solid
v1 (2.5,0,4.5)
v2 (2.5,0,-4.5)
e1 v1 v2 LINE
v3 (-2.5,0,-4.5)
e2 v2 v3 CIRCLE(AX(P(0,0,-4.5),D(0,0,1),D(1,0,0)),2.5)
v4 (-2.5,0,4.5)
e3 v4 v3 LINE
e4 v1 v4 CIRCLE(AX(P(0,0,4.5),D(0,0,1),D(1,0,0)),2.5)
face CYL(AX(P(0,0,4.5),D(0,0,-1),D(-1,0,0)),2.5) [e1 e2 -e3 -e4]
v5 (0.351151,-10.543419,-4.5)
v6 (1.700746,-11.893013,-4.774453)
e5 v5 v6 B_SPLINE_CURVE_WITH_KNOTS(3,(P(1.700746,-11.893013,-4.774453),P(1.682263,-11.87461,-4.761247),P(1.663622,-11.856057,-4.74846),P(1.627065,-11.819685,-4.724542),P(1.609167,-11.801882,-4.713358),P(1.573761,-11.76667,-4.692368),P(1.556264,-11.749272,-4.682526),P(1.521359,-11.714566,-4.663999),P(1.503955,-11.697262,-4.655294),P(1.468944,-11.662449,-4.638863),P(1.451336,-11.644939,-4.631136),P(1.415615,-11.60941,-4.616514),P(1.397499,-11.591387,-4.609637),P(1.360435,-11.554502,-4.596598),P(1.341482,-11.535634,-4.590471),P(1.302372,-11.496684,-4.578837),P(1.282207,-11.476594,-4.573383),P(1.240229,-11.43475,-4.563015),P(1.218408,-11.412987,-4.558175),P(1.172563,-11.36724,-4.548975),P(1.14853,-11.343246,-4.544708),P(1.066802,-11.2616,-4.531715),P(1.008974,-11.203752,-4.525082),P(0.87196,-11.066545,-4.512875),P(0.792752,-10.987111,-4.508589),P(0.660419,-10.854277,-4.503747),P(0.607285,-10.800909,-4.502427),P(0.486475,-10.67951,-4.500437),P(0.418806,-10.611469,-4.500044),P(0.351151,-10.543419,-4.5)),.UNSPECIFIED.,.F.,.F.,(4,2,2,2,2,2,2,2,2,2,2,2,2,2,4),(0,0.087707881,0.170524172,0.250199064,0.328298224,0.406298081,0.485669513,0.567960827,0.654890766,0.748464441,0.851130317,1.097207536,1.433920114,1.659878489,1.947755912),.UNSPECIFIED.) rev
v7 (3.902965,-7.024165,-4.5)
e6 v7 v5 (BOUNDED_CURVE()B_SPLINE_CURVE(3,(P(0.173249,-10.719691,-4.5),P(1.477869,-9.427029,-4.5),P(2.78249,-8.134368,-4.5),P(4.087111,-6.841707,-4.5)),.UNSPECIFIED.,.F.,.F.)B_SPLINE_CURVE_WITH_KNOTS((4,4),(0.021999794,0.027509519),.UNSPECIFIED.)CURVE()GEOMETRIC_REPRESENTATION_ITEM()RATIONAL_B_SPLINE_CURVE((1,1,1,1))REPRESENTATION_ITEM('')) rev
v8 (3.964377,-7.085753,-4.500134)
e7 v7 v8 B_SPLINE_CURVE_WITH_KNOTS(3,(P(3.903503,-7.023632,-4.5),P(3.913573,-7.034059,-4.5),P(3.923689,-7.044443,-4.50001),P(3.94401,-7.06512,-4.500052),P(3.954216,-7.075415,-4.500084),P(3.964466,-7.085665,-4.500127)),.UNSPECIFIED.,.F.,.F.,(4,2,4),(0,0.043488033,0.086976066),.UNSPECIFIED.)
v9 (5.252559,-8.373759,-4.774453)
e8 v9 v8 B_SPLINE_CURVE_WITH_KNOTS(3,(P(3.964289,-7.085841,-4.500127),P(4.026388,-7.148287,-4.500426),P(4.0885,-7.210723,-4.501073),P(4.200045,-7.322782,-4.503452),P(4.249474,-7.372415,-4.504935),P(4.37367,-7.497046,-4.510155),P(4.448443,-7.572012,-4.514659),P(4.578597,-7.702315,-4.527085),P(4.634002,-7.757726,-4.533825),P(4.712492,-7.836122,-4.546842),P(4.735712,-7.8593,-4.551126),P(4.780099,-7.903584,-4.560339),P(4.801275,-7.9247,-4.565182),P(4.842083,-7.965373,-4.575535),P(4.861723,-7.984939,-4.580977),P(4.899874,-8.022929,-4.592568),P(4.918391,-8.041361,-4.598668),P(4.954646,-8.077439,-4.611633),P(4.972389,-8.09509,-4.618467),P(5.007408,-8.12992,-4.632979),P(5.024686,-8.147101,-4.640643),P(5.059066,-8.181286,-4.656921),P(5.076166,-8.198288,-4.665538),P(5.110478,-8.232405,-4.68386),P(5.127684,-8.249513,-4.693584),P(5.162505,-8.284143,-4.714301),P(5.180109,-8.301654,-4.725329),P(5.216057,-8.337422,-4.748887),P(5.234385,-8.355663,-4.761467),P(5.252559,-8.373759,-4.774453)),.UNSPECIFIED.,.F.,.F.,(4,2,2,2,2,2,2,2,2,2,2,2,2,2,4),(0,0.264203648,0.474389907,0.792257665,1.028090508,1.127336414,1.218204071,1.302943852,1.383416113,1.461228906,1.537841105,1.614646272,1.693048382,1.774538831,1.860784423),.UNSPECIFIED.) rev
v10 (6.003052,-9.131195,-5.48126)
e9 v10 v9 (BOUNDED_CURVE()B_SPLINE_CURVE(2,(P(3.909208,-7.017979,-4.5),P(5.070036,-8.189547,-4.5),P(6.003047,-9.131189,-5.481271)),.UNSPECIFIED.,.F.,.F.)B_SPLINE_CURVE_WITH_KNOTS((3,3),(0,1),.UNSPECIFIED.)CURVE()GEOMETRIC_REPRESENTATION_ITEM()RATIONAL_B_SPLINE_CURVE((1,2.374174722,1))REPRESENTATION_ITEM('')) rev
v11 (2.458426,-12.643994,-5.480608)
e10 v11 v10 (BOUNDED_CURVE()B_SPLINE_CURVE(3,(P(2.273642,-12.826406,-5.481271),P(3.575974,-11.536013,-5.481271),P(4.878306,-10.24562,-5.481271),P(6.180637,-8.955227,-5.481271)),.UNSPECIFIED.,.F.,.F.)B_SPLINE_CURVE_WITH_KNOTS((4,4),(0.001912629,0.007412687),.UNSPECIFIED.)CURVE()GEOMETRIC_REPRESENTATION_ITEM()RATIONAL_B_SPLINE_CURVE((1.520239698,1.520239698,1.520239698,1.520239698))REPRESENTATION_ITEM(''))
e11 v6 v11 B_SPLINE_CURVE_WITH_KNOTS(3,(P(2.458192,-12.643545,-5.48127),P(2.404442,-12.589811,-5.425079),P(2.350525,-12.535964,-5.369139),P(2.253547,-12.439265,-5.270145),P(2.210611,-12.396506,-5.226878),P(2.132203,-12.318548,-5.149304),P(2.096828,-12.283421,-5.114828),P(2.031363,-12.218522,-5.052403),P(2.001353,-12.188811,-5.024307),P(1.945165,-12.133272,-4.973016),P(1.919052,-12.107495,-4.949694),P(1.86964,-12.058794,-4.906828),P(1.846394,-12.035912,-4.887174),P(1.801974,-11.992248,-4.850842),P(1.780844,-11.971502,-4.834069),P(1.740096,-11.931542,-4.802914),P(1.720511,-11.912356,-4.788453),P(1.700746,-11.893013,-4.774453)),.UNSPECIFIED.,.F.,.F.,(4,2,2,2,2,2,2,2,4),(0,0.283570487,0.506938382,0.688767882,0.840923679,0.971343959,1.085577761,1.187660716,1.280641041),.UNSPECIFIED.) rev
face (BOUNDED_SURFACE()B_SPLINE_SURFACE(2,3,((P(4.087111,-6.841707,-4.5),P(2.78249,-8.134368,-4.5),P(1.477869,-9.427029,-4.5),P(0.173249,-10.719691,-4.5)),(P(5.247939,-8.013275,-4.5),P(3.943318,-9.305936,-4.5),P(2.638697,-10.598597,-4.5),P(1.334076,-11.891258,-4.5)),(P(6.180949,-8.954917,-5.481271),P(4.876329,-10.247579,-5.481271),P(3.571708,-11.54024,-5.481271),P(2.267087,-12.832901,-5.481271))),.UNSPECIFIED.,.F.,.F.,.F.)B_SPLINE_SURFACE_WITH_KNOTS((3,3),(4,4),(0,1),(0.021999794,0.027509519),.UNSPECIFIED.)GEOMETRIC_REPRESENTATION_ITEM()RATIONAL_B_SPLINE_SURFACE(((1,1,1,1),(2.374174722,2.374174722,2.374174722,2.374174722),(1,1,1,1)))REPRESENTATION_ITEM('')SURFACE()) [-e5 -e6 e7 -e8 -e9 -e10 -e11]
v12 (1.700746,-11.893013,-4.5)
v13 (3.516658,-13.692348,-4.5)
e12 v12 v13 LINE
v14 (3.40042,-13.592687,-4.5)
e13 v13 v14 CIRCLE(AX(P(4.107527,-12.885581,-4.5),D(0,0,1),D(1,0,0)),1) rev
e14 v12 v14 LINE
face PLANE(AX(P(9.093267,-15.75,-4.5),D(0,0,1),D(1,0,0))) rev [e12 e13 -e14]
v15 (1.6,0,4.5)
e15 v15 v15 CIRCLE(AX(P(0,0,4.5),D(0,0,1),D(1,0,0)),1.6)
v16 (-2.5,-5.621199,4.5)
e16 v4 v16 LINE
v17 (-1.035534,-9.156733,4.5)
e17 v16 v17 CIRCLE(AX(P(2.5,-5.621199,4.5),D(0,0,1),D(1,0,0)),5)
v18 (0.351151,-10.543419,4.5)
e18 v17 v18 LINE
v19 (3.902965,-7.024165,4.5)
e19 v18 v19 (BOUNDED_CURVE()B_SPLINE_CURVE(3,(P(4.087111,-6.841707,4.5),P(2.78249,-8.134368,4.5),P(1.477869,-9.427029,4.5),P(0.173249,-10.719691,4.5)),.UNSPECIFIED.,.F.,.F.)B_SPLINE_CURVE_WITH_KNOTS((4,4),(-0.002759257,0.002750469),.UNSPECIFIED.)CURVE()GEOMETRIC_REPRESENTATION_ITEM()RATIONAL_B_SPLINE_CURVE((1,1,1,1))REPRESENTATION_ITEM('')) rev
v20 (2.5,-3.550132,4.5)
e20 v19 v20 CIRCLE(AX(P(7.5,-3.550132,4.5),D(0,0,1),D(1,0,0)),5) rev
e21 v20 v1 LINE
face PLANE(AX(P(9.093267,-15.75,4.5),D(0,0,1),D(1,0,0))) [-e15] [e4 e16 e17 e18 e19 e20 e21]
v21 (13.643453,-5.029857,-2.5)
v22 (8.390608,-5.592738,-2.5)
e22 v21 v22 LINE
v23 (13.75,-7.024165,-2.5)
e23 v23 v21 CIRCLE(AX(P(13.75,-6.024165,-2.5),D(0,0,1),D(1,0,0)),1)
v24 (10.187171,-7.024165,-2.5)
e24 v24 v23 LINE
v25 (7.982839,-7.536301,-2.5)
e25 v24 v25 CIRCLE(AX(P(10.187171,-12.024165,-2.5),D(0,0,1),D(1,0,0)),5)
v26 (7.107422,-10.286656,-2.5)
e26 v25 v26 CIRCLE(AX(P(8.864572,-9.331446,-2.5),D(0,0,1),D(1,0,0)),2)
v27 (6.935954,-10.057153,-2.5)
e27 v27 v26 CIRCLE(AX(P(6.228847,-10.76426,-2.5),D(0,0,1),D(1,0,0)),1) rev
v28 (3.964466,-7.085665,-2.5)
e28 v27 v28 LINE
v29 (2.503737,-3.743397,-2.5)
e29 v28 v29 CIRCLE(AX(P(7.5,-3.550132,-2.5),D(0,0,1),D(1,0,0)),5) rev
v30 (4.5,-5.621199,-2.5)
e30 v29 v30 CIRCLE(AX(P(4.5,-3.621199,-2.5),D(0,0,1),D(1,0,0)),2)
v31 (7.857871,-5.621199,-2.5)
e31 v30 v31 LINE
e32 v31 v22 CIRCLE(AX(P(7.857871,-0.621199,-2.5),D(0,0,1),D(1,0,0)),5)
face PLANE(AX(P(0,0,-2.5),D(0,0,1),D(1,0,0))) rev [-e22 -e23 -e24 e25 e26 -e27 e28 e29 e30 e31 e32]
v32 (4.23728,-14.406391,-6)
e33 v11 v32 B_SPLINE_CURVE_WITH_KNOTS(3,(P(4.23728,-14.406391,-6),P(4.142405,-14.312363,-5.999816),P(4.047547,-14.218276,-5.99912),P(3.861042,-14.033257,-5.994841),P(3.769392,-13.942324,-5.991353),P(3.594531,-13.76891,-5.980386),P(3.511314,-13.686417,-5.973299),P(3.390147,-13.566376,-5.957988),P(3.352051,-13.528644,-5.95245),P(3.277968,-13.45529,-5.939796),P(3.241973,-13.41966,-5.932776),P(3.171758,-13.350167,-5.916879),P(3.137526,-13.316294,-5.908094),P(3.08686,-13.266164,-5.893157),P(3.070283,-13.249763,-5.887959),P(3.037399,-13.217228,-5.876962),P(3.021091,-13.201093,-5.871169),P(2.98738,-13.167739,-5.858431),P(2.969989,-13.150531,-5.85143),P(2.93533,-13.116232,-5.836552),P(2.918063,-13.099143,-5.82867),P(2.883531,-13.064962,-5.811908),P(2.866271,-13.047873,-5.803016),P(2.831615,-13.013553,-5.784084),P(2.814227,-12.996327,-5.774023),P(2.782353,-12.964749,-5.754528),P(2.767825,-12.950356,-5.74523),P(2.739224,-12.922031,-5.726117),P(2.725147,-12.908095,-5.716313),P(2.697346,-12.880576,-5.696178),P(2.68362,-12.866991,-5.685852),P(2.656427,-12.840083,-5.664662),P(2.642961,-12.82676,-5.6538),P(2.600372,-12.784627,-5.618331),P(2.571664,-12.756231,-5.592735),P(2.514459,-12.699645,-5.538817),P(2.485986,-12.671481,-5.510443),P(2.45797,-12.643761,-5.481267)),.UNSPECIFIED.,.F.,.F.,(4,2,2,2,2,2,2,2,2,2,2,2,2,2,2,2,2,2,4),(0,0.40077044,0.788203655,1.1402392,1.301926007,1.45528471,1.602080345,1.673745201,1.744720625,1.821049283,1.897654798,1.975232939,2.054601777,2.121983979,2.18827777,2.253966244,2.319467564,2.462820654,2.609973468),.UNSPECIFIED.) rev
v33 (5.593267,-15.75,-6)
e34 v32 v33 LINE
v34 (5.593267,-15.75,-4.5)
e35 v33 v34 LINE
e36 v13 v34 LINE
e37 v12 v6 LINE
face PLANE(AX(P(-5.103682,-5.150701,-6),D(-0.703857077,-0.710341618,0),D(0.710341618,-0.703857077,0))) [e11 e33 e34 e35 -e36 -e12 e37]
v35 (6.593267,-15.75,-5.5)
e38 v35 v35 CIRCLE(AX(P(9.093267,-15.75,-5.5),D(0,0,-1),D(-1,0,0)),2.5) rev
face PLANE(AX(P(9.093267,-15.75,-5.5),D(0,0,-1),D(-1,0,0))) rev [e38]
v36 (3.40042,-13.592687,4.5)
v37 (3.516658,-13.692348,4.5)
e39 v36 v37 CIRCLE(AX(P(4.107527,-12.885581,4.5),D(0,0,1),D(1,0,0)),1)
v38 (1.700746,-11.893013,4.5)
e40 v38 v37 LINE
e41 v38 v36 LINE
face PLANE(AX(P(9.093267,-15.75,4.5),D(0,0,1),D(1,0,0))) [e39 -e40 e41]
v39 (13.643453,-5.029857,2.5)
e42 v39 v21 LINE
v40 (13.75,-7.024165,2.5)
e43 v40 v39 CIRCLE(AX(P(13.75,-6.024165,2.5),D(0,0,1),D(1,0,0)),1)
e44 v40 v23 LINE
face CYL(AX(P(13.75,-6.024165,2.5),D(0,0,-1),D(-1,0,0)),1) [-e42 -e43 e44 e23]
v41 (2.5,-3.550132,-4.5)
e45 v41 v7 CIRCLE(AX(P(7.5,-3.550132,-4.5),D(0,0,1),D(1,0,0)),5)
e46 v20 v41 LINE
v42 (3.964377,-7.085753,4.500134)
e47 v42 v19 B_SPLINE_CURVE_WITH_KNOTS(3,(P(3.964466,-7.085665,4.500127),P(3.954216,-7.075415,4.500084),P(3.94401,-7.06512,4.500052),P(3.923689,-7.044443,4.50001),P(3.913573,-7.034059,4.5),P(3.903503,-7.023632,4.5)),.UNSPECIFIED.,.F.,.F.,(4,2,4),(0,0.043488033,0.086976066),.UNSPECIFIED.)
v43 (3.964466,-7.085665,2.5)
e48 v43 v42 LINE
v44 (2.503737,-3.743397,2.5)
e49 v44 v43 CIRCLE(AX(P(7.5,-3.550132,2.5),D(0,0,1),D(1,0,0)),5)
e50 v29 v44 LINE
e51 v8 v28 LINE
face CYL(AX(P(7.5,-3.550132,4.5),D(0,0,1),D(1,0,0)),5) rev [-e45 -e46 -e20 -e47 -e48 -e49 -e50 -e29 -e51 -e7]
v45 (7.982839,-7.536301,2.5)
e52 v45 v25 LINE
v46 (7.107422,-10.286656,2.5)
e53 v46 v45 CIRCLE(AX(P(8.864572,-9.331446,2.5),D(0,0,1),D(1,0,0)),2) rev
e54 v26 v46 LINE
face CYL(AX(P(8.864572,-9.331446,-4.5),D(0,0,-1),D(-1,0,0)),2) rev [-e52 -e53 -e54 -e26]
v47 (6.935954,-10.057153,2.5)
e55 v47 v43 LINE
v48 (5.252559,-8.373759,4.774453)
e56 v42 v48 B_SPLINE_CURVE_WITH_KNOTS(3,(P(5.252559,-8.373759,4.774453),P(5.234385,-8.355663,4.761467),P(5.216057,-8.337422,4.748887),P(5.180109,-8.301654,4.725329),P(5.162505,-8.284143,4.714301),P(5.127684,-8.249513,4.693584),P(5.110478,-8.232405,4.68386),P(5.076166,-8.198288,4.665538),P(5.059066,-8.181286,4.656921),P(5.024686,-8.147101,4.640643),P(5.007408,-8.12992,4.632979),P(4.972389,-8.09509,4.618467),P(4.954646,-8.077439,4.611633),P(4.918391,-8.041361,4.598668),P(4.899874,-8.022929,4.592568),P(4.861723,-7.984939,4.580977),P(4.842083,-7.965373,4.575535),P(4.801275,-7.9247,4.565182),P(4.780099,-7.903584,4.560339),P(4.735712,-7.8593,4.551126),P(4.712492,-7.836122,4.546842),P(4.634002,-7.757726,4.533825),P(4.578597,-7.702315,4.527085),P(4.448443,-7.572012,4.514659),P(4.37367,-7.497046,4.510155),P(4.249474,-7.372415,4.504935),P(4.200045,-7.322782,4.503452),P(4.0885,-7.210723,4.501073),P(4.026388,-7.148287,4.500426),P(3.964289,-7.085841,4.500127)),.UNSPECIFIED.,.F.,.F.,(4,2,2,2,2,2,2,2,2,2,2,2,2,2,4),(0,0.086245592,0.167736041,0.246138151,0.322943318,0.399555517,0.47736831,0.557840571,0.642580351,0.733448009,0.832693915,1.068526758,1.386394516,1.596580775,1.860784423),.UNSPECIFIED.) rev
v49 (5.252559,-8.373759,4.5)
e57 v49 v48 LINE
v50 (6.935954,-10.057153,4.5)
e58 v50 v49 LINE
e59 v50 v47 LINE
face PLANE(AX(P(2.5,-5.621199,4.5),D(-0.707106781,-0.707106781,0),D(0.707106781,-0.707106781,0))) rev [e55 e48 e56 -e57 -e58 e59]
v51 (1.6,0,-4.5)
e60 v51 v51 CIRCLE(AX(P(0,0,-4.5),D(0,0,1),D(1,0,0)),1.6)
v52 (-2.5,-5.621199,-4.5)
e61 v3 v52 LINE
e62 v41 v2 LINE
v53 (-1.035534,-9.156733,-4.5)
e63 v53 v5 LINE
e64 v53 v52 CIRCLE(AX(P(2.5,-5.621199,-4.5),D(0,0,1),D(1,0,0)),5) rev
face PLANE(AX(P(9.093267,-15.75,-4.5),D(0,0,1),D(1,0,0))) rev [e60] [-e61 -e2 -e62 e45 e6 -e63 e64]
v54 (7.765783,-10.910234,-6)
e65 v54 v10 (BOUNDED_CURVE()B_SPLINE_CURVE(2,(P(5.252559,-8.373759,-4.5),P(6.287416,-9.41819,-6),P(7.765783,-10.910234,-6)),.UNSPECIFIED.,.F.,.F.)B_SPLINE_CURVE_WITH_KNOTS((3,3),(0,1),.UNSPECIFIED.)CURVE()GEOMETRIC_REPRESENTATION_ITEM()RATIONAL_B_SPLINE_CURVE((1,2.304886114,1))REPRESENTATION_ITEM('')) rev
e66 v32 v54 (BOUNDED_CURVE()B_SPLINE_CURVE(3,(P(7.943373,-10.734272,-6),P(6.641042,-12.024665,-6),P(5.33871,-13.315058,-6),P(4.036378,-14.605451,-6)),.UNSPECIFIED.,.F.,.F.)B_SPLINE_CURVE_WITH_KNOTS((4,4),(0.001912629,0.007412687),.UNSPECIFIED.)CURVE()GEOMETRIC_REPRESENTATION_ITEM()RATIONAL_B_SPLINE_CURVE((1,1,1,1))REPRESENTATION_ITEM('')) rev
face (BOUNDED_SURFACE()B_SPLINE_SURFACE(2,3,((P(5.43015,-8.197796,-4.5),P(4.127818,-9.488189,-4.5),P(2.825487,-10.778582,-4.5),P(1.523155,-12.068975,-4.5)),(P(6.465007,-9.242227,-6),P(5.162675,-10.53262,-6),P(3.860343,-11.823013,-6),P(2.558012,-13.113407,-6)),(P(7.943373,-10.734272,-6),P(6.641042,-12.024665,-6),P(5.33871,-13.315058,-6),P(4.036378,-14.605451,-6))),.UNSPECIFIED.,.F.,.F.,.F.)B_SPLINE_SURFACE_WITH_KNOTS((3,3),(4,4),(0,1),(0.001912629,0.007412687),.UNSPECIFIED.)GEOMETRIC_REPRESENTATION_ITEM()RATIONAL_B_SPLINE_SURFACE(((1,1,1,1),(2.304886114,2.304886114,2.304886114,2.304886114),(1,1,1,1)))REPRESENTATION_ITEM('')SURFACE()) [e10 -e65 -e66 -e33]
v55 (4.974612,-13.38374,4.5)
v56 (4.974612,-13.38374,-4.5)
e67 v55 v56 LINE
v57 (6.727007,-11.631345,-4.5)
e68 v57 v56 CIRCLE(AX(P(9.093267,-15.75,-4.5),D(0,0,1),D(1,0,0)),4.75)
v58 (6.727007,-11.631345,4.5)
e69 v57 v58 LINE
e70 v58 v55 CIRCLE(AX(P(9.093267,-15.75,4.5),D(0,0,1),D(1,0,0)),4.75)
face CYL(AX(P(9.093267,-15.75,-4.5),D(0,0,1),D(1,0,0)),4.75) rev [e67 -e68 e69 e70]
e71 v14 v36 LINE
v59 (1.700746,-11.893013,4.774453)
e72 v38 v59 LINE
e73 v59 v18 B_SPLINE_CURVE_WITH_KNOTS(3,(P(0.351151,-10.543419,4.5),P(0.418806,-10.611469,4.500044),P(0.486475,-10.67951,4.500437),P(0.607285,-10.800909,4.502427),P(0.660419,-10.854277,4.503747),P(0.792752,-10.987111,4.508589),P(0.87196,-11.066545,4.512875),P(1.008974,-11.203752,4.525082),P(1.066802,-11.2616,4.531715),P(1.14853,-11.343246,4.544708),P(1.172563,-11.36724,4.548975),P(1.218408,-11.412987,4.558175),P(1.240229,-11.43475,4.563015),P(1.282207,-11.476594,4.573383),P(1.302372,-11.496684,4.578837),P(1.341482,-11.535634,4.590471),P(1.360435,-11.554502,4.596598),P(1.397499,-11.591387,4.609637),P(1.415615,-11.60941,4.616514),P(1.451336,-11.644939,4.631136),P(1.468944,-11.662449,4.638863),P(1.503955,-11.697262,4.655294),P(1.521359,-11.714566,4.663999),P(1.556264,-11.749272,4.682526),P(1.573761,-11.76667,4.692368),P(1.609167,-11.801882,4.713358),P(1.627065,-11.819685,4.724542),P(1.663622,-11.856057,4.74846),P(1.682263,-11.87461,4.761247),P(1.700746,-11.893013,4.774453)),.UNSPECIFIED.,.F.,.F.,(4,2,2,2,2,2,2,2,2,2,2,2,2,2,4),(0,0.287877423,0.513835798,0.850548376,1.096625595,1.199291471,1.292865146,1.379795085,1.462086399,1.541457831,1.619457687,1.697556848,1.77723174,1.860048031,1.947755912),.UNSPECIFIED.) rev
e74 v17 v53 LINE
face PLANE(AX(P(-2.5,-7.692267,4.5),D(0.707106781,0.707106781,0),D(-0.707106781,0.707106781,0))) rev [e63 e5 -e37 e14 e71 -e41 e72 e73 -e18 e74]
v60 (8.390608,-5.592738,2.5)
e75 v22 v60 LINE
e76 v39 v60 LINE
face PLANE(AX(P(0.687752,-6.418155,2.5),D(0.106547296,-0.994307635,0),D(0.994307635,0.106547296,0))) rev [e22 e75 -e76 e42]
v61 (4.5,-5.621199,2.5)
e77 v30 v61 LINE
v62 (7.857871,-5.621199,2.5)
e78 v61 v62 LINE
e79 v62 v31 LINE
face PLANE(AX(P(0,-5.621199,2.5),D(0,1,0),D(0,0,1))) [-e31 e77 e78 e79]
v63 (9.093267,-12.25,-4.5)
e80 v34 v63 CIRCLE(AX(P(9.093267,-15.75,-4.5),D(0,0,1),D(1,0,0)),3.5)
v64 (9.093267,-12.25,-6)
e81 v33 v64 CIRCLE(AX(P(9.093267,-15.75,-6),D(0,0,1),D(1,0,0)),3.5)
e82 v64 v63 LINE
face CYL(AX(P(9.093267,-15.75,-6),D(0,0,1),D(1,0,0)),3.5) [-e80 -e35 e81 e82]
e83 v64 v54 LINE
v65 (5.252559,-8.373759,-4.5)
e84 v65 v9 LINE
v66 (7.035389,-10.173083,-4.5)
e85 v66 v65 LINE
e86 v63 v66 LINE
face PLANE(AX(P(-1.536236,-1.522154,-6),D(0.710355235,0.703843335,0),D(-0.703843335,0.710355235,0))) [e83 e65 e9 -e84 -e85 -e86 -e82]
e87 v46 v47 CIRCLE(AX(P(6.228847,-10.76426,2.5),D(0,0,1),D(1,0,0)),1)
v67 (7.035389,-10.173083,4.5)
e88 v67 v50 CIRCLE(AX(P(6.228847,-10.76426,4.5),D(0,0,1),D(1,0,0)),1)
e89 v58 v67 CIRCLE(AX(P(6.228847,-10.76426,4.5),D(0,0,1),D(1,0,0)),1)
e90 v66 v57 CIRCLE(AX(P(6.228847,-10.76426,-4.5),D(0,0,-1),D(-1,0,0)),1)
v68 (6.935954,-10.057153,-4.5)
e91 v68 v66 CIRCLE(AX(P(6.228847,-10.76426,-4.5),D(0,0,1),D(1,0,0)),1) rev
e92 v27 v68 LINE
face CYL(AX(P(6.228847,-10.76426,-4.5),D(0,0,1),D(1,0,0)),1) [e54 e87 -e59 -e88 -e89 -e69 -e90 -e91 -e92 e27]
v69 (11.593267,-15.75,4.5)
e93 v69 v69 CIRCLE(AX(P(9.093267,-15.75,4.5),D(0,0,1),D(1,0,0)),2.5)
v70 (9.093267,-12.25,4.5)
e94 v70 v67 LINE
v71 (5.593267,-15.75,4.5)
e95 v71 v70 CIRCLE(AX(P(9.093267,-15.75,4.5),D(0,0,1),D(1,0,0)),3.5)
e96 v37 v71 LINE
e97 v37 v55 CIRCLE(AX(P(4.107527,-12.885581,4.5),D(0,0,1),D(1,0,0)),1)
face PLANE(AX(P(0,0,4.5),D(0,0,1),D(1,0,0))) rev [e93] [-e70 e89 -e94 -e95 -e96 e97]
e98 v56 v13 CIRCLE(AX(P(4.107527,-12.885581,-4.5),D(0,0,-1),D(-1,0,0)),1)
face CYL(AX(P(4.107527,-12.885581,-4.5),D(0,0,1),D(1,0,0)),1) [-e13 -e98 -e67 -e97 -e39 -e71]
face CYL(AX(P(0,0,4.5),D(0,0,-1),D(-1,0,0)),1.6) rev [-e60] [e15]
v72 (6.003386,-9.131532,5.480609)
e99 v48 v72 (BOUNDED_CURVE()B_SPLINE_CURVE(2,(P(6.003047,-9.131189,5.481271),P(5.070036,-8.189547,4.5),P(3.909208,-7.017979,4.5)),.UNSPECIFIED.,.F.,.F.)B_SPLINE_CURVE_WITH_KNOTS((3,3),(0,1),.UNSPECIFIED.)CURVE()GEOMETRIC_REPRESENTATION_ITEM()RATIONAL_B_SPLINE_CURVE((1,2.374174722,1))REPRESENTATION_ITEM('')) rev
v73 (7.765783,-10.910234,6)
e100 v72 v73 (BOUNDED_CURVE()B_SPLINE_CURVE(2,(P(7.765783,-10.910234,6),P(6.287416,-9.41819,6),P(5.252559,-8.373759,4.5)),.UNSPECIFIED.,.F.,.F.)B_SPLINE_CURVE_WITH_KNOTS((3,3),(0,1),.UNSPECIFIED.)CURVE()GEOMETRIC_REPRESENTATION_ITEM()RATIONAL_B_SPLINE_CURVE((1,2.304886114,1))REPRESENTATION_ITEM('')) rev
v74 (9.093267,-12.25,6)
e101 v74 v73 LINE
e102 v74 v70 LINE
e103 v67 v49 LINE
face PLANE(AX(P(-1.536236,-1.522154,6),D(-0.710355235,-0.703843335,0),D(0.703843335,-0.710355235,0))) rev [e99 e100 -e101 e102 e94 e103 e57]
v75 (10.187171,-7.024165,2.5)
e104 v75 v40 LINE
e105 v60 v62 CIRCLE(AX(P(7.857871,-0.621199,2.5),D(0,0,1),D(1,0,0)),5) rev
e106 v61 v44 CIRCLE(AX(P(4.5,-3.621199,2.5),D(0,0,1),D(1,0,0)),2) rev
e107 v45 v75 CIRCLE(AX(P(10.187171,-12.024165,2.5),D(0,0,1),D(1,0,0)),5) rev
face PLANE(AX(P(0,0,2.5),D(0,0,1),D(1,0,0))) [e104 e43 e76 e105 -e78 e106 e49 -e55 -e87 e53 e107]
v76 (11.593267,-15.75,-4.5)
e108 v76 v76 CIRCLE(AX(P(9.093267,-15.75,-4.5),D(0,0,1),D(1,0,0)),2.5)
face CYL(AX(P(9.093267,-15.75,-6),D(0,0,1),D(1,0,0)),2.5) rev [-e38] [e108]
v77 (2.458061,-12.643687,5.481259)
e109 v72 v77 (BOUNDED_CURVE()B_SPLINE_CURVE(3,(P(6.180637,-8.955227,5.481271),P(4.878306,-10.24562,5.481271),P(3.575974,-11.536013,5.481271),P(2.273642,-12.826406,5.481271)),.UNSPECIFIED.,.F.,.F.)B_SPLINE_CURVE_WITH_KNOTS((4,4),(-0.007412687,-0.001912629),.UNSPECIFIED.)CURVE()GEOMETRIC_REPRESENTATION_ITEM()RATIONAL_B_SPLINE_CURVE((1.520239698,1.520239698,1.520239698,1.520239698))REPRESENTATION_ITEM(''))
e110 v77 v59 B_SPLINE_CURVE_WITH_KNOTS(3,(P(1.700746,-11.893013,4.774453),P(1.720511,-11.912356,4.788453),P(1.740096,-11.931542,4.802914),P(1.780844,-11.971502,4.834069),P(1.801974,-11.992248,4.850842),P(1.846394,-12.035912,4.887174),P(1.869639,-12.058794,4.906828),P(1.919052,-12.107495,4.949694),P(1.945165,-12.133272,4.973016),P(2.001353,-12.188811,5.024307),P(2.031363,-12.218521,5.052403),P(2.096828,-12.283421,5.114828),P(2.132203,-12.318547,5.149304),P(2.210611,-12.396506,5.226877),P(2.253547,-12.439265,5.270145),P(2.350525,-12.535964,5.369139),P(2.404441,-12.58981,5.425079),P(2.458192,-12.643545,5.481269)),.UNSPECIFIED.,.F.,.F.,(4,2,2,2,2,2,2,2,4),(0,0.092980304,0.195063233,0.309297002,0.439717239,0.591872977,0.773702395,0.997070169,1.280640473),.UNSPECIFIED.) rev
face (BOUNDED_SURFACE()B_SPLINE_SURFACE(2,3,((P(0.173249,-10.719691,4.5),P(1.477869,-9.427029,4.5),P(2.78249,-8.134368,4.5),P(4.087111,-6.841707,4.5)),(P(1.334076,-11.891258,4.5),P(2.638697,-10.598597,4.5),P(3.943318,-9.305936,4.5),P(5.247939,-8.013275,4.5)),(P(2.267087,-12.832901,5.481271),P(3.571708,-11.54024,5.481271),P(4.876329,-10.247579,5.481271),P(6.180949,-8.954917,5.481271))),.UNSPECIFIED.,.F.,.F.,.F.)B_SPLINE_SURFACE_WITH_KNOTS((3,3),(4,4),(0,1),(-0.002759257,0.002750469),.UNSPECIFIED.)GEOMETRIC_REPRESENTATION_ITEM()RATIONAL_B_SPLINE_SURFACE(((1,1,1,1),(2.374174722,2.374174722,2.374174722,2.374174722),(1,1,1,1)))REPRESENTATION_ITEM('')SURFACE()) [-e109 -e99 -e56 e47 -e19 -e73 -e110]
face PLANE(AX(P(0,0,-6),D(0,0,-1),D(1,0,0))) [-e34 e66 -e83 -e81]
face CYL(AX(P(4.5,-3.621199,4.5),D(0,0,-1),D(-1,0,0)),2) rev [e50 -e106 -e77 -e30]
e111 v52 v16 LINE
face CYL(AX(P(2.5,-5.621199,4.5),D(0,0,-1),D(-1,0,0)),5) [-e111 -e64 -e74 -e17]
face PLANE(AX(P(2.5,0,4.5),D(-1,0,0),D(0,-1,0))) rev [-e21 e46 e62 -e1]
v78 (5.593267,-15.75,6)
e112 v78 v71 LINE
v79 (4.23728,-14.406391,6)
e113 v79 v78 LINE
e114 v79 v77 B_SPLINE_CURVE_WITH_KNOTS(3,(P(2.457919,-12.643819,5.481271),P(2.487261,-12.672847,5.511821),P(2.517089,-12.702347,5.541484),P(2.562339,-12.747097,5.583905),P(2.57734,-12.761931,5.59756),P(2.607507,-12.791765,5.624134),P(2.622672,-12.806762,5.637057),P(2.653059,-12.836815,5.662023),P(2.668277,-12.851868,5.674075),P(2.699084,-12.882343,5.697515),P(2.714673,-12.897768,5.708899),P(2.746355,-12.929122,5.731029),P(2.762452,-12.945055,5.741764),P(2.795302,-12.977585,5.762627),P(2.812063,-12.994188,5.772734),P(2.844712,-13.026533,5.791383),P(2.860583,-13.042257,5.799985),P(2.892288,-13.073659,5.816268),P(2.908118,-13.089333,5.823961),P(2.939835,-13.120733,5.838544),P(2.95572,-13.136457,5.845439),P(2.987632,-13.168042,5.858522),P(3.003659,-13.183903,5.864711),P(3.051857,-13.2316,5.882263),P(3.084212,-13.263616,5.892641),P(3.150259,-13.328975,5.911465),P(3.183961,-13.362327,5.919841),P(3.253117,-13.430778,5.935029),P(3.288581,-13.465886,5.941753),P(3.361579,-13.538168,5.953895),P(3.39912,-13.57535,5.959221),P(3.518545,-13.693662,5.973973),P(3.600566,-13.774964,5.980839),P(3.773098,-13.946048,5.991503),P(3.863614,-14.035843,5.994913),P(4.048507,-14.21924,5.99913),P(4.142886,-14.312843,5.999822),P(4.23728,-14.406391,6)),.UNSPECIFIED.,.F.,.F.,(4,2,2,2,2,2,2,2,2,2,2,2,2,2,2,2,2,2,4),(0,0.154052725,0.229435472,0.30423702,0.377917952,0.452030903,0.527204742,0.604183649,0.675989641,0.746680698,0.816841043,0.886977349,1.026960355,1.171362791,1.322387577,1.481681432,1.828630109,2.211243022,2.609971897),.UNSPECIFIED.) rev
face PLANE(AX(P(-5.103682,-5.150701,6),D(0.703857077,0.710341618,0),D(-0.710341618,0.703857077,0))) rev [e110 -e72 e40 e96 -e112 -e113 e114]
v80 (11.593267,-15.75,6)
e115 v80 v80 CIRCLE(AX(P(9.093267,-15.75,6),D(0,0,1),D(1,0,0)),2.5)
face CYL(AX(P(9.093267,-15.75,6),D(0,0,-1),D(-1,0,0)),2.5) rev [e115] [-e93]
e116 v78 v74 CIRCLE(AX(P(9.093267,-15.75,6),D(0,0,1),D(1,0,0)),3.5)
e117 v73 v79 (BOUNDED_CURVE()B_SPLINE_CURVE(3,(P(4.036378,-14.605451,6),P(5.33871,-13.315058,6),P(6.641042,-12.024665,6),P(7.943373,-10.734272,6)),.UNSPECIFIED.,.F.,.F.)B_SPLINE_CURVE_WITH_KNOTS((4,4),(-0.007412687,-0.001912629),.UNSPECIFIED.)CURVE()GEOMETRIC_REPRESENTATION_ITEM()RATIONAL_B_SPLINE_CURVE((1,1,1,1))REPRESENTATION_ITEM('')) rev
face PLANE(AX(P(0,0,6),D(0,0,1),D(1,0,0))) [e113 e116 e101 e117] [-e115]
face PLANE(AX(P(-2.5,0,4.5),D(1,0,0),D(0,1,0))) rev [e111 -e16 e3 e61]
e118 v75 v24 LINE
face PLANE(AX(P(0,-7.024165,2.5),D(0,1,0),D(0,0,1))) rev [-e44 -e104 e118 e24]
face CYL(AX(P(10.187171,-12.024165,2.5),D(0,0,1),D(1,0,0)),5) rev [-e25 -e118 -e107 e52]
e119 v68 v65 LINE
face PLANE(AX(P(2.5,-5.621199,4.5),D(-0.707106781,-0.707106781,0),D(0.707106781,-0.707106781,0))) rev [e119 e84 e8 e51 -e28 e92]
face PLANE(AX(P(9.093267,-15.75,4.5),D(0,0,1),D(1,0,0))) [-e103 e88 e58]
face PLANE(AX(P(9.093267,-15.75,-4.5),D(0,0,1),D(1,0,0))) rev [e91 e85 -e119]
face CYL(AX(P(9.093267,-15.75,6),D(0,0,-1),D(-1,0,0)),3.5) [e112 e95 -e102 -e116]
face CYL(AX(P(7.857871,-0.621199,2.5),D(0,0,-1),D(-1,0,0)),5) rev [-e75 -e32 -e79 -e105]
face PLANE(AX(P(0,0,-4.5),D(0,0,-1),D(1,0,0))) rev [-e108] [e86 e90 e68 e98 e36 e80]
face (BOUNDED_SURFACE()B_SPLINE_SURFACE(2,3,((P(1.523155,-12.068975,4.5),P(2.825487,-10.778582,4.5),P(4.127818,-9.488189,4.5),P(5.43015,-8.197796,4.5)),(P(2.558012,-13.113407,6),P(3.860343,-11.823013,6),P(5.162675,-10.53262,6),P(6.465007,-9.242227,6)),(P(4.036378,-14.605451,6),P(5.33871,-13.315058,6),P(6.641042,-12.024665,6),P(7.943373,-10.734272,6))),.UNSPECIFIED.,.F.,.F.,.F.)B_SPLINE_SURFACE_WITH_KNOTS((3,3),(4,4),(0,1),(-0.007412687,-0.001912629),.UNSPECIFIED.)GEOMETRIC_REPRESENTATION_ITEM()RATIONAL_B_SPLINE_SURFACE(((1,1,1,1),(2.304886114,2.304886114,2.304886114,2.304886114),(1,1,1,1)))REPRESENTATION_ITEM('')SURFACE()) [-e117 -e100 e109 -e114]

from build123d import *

# Parameters (mm, degrees)
SKETCH1_R           = 1.6
SKETCH1_R_2         = 2.4999999999999964
BOSS_EXTRUDE1_DEPTH = 4.5
SKETCH3_R           = 4.750000000000001
CUT_EXTRUDE1_DEPTH  = 9
BOSS_EXTRUDE2_START = 1.5
SKETCH4_R           = 3.4999999999999996
SKETCH4_R_2         = 2.5000000000000018
BOSS_EXTRUDE2_DEPTH = 1.5
FILLET1_START       = -8.126082892
FILLET1_DEPTH       = 5.963451672
FILLET3_R           = 1
SKETCH5_R           = 2.5000000000000018
BOSS_EXTRUDE3_DEPTH = 0.5
BOSS_EXTRUDE4_DEPTH = 2.5
FILLET4_R           = 5
FILLET5_R           = 2
FILLET6_R           = 5


with BuildPart() as part:
    # Sketch1 → Boss-Extrude1 (new, symmetric)
    with BuildSketch(Plane.XY):
        with BuildLine():
            Line((-2.5, 0), (-2.499999999999999, -7.6922671661961415))
            Line((-2.499999999999999, -7.6922671661961415), (5.59344897920139, -15.785716145397497))
            ThreePointArc((5.59344897920139, -15.785716145397497), (11.568140473889555, -18.224873734152915), (9.128982885134128, -12.250182239464754))
            Line((9.128982885134128, -12.250182239464754), (2.500000000000001, -5.621199354330655))
            Line((2.500000000000001, -5.621199354330655), (2.5, 0))
            ThreePointArc((2.5, 0), (1.5e-16, 2.5), (-2.5, 0))
        make_face()
        Circle(SKETCH1_R, mode=Mode.SUBTRACT)
        with Locations((9.093266739736636, -15.75)):
            Circle(SKETCH1_R_2, mode=Mode.SUBTRACT)
    extrude(amount=BOSS_EXTRUDE1_DEPTH, both=True)

    # Sketch3 → Cut-Extrude1 (cut)
    with BuildSketch(Plane.XY.offset(4.5)):
        with Locations((9.093266739736636, -15.75)):
            Circle(SKETCH3_R)
    extrude(amount=-CUT_EXTRUDE1_DEPTH, mode=Mode.SUBTRACT)

    # Sketch4 → Boss-Extrude2 (add)
    # profile 1 of 3: a face of its own
    with BuildSketch(Plane.XY.offset(4.5).offset(BOSS_EXTRUDE2_START)):
        with BuildLine():
            ThreePointArc((4.4744473247851495, -14.641394023077986), (5.734522129252316, -12.391230189259387), (7.98469541716161, -11.131172267472593))
            Line((7.9846954171615945, -11.13117226747262), (5.252559389002018, -8.37375874333266))
            Line((5.252559389002018, -8.37375874333266), (1.700745560054771, -11.89301272625091))
            Line((1.7007455600547712, -11.89301272625091), (4.474447324785227, -14.641394023077948))
        make_face()
    # profile 2 of 3: a face of its own
    with BuildSketch(Plane.XY.offset(4.5).offset(BOSS_EXTRUDE2_START)):
        with BuildLine():
            ThreePointArc((5.593266739736636, -15.75), (6.61839300558372, -13.275126265847083), (9.093266739736636, -12.25))
            Line((9.093266739736636, -12.25), (7.9846954171615945, -11.13117226747262))
            ThreePointArc((7.98469541716161, -11.131172267472593), (5.734522129252316, -12.391230189259387), (4.4744473247851495, -14.641394023077986))
            Line((4.474447324785227, -14.641394023077948), (5.593266739736636, -15.75))
        make_face()
    # profile 3 of 3: a face of its own
    with BuildSketch(Plane.XY.offset(4.5).offset(BOSS_EXTRUDE2_START)):
        with Locations((9.093266739736636, -15.75)):
            Circle(SKETCH4_R)
        with Locations((9.093266739736636, -15.75)):
            Circle(SKETCH4_R_2, mode=Mode.SUBTRACT)
    boss_extrude2 = extrude(amount=-BOSS_EXTRUDE2_DEPTH)

    # Mirror1: Boss-Extrude2 across plane
    add(boss_extrude2.mirror(Plane.XY))

    # Fillet1: read off the stored shape, not the designer's step
    # Fillet1 outline → Fillet1 (cut)
    with BuildSketch(Plane(origin=(0, 0, 0), x_dir=(0.7038433348722607, -0.7103552350450406, 0), z_dir=(0.7103552350450406, 0.7038433348722604, 0)).offset(FILLET1_START)):
        with BuildLine():
            Line((9.645322277, 6), (9.645322277, 4.5))
            add(Edge.make_bspline(
                [(9.645322277, 4.5), (11.115616365533654, 6.000000000002685), (13.216036492, 6)],
                knots=[0, 0, 0, 1, 1, 1], degree=2, weights=[1, 2.30488611432322, 1]))
            Line((13.216036492, 6), (9.645322277, 6))
        make_face()
        with BuildLine():
            add(Edge.make_bspline(
                [(9.645322277, -4.5), (11.115616365534704, -5.999999999999404), (13.216036492, -6)],
                knots=[0, 0, 0, 1, 1, 1], degree=2, weights=[1, 2.30488611432322, 1]))
            Line((9.645322277, -4.5), (9.645322277, -6))
            Line((9.645322277, -6), (13.216036492, -6))
        make_face()
    extrude(amount=FILLET1_DEPTH, mode=Mode.SUBTRACT)

    # Fillet2
    # a fillet whose section is not a circle: 5 mm, written as the material it adds along each edge (its section moved 0.00015 mm through the faces so that the kernel can cut it)
    with BuildSketch(Plane(origin=(5.252559389002018, -8.37375874333266, -4.5), x_dir=(-0.7038433326996095, 0.7103552328501724, 7.859188268463715e-05), z_dir=(-0.7103552350439925, -0.7038433348733185, 0))) as fillet2_piece_1_section:
        with BuildLine():
            Bezier((1.9085940541919586, 0), (0.25927433920384835, -0.00012962314195013), (-1.0664365698179072, 0.9810666491436392), weights=[1, 2.3741747222401877, 1])
            Line((-1.0664365698179072, 0.9810666491436392), (-1.1259275381450011, 0.9006873938130198))
            ThreePointArc((-1.1259275381450011, 0.9006873938130198), (-0.5842679506665102, 0.43645084882092705), (-0.07140878262543363, -0.07000561237467808))
            Line((-0.07140878262543363, -0.07000561237467808), (7.85918826802e-06, -0.09999999969116545))
            ThreePointArc((7.85918826802e-06, -0.09999999969116545), (0.9543048803898561, -0.09992499969139726), (1.9086019133802261, -0.09999999969116545))
            Line((1.9086019133802261, -0.09999999969116545), (1.9085940541919586, 0))
        make_face()
    fillet2_piece_1 = extrude(amount=9.771538142377612, mode=Mode.PRIVATE)
    fillet2_piece_1 = split(fillet2_piece_1, bisect_by=Plane(origin=(5.252559389002018, -8.37375874333266, -4.5), z_dir=(-0.707106781186546, -0.707106781186549, 0)), keep=Keep.TOP, mode=Mode.PRIVATE)
    fillet2_piece_1 = split(fillet2_piece_1, bisect_by=Plane(origin=(1.7170254830692855, -11.909292649265407, -4.5), z_dir=(0.707106781186546, 0.707106781186549, 0)), keep=Keep.TOP, mode=Mode.PRIVATE)
    fillet2_piece_1 = split(fillet2_piece_1, bisect_by=Plane(origin=(1.7333853025127066, -11.925354508213672, -4.5), z_dir=(0.7038570774376808, 0.7103416181957006, 0)), keep=Keep.TOP, mode=Mode.PRIVATE)
    add(fillet2_piece_1)
    with BuildSketch(Plane(origin=(5.252559389002018, -8.37375874333266, 4.5), x_dir=(-0.7038433326996095, 0.7103552328501724, -7.85918826847737e-05), z_dir=(-0.7103552350439925, -0.7038433348733185, 0))) as fillet2_piece_2_section:
        with BuildLine():
            Bezier((1.9085940541886428, 0), (0.25927433920271037, 0.00012962314195018), (-1.0664365698180711, -0.9810666491413066), weights=[1, 2.374174722240495, 1])
            Line((-1.0664365698180711, -0.9810666491413066), (-1.125927538145101, -0.9006873938106411))
            ThreePointArc((-1.125927538145101, -0.9006873938106411), (-0.5842679506666038, -0.4364508488196), (-0.07140878262533187, 0.0700056123747811))
            Line((-0.07140878262533187, 0.0700056123747811), (7.8591882693e-06, 0.09999999969116545))
            ThreePointArc((7.8591882693e-06, 0.09999999969116545), (0.9543048803881994, 0.09992499969139726), (1.9086019133769117, 0.09999999969116545))
            Line((1.9086019133769117, 0.09999999969116545), (1.9085940541886428, 0))
        make_face()
    fillet2_piece_2 = extrude(amount=9.771538142369321, mode=Mode.PRIVATE)
    fillet2_piece_2 = split(fillet2_piece_2, bisect_by=Plane(origin=(1.7170254830692855, -11.909292649265407, 4.5), z_dir=(0.707106781186546, 0.707106781186549, 0)), keep=Keep.TOP, mode=Mode.PRIVATE)
    fillet2_piece_2 = split(fillet2_piece_2, bisect_by=Plane(origin=(5.252559389002018, -8.37375874333266, 4.5), z_dir=(-0.707106781186546, -0.707106781186549, 0)), keep=Keep.TOP, mode=Mode.PRIVATE)
    fillet2_piece_2 = split(fillet2_piece_2, bisect_by=Plane(origin=(1.7333853025127066, -11.925354508213672, 4.5), z_dir=(0.7038570774376808, 0.7103416181957006, 0)), keep=Keep.TOP, mode=Mode.PRIVATE)
    add(fillet2_piece_2)

    # Fillet3
    # the kernel refuses this fillet: 1 mm, written as the material it takes off along each edge
    with BuildSketch(Plane(origin=(4.4695848720713, -14.661852038267408, -4.5), x_dir=(0.3674872938849202, 0.9300285419454277, 0), z_dir=(0, 0, 1))) as fillet3_piece_1:
        with BuildLine():
            CenterArc((1.5189314922424455, 0.9894814011805907), FILLET3_R, 156.5607354128971, 105.12166531490846)
            Line((0.6014492460298756, 1.3872581323813222), (0, 0))
            ThreePointArc((0, 0), (0.68713567506206, 0.04996334439219424), (1.3742713501241177, -2e-17))
        make_face()
    extrude(amount=9, mode=Mode.SUBTRACT)
    with BuildSketch(Plane(origin=(8.005118778004036, -11.126318132334667, -4.5), x_dir=(-0.7071067811866694, 0.7071067811864257, 0), z_dir=(0, 0, 1))) as fillet3_piece_2:
        with BuildLine():
            CenterArc((1.512027222443001, 1.0000000000000007), FILLET3_R, 164.87833468508381, 105.1216653149063)
            ThreePointArc((0.5466531654354455, 1.2608695652175128), (0.3191670641589702, 0.6105605267965641), (0, 0))
            Line((0, 0), (1.5120272224428286, 4e-17))
        make_face()
    extrude(amount=9, mode=Mode.SUBTRACT)

    # Sketch5 → Boss-Extrude3 (add)
    with BuildSketch(Plane(origin=(0, 0, -6), x_dir=(-1, 0, 0), z_dir=(0, 0, -1))):
        with Locations(Location((-9.093266739736636, -15.75, 0), (0, 0, 180))):
            Circle(SKETCH5_R)
    extrude(amount=-BOSS_EXTRUDE3_DEPTH)

    # Sketch7 → Boss-Extrude4 (add, symmetric)
    with BuildSketch(Plane.XY):
        with BuildLine():
            ThreePointArc((12.834784737336257, -5.621199354330662), (12.912454393011577, -6.570532060599576), (13.749999999999998, -7.024164641901866))
            Line((13.749999999999998, -7.024164641901864), (13.75, -5.621199354330655))
            Line((13.75, -5.621199354330655), (12.834784737336253, -5.621199354330655))
        make_face()
        with BuildLine():
            Line((13.75, -5.621199354330655), (13.749999999999998, -7.024164641901864))
            ThreePointArc((13.749999999999998, -7.024164641901866), (14.457106781186546, -6.731271423088413), (14.75, -6.024164641901864))
            ThreePointArc((14.75, -6.024164641901864), (14.418375906356768, -5.280340974759061), (13.643452704396466, -5.029857006509489))
            ThreePointArc((13.643452704396466, -5.029857006509489), (13.159727923368479, -5.216960283917396), (12.834784737336257, -5.621199354330662))
            Line((12.834784737336253, -5.621199354330655), (13.75, -5.621199354330655))
        make_face()
        with BuildLine():
            Line((6.614639823149787, -7.024164641901864), (8.129576761852361, -7.024164641901864))
            Line((8.129576761852361, -7.024164641901864), (13.75, -7.024164641901864))
            ThreePointArc((13.749999999999998, -7.024164641901866), (12.912454393011577, -6.570532060599576), (12.834784737336257, -5.621199354330662))
            Line((12.834784737336253, -5.621199354330655), (8.125, -5.621199354330655))
            Line((8.125, -5.621199354330655), (2.500000000000001, -5.621199354330655))
            Line((2.500000000000001, -5.621199354330655), (3.9029652875712157, -7.024164641901864))
            Line((3.9029652875712157, -7.024164641901864), (6.614639823149787, -7.024164641901864))
        make_face()
        Polygon((5.252559389002302, -8.373758743332944), (6.0030522403921855, -9.13119509235208), (8.129576761852361, -7.024164641901864), (6.614639823149787, -7.024164641901864), align=None)
        Polygon((3.9029652875712157, -7.024164641901864), (5.252559389002302, -8.373758743332944), (6.614639823149787, -7.024164641901864), align=None)
        with BuildLine():
            Line((8.125, -5.621199354330655), (12.834784737336253, -5.621199354330655))
            ThreePointArc((12.834784737336257, -5.621199354330662), (13.159727923368479, -5.216960283917396), (13.643452704396466, -5.029857006509489))
            Line((13.643452704396466, -5.0298570065094905), (8.125, -5.621199354330655))
        make_face()
    extrude(amount=BOSS_EXTRUDE4_DEPTH, both=True)

    # Fillet4
    fillet4_edges = [part.edges().sort_by_distance(p)[0] for p in [
        (8.125, -5.621199354330655, 0),
        (8.129576761852361, -7.024164641901864, 0),
    ]]
    fillet(fillet4_edges, radius=FILLET4_R)

    # Fillet5
    # the kernel refuses this fillet: 2 mm, written as the material it adds along each edge
    with BuildSketch(Plane(origin=(6.006539975421141, -9.12773932975214, -2.5), x_dir=(0.6887204470321209, -0.7250269966283157, 0), z_dir=(0, 0, 1))) as fillet5_piece_1:
        with BuildLine():
            CenterArc((2.11607805444544, 1.9318531703443815), FILLET5_R, 162.6302604591367, 92.36990753869333)
            Line((0.20728179001408314, 2.5289267176506547), (0.0164021635709476, 2.5886340723812813))
            ThreePointArc((0.0164021635709476, 2.5886340723812813), (-0.21957324686099225, 0.9266827798096786), (-0.19995560376753524, -0.00421384882979087))
            Line((-0.19995560376753524, -0.00421384882979087), (0.005134521484191, -0.19993408085948786))
            ThreePointArc((0.005134521484191, -0.19993408085948786), (1.319091329821553, -0.16619026173425153), (1.5466823860752452, -0.19318531703443798))
            Line((1.5466823860752452, -0.19318531703443798), (1.5984456286543542, -7e-17))
        make_face()
    extrude(amount=5)
    with BuildSketch(Plane(origin=(2.500000000000001, -5.621199354330655, 2.5), x_dir=(1, 0, 0), z_dir=(0, 0, -1))) as fillet5_piece_2:
        with BuildLine():
            CenterArc((FILLET5_R, -FILLET5_R), FILLET5_R, 90, 90)
            Line((-8.9e-16, -FILLET5_R), (0, 0))
            Line((0, 0), (FILLET5_R, 0))
        make_face()
    extrude(amount=5)

    # Fillet6
    # the kernel refuses this fillet: 5 mm, written as the material it adds along each edge
    with BuildSketch(Plane(origin=(2.500000000000001, -5.621199354330655, 4.5), x_dir=(-4.3e-16, 1, 0), z_dir=(0, 0, -1)), Plane(origin=(2.500000000000001, -5.621199354330655, 2.677669529663687), x_dir=(-4.3e-16, 1, 0), z_dir=(0, 0, -1))) as fillet6_piece_1:
        with BuildLine():
            CenterArc((FILLET6_R * 0.414213562373, FILLET6_R), FILLET6_R, 225.00000000000003, 45)
            Line((-FILLET6_R * 0.292893218813, FILLET6_R * 0.292893218813), (0, 0))
            Line((0, 0), (FILLET6_R * 0.414213562373, 0))
        make_face()
    extrude(amount=7.177669529663687)
    # the kernel refuses this fillet: 5 mm, written as the material it takes off along each edge
    with BuildSketch(Plane(origin=(-2.499999999999999, -7.6922671661961415, -9.677669529663689), x_dir=(-2.1e-16, 1, 0), z_dir=(0, 0, 1))) as fillet6_2_piece_1:
        with BuildLine():
            CenterArc((FILLET6_R * 0.414213562373, -FILLET6_R), FILLET6_R, 90, 45)
            Line((-FILLET6_R * 0.292893218813, -FILLET6_R * 0.292893218813), (0, 0))
            Line((0, 0), (FILLET6_R * 0.414213562373, 0))
        make_face()
    extrude(amount=19.355339059327378, mode=Mode.SUBTRACT)


solid = part.part
